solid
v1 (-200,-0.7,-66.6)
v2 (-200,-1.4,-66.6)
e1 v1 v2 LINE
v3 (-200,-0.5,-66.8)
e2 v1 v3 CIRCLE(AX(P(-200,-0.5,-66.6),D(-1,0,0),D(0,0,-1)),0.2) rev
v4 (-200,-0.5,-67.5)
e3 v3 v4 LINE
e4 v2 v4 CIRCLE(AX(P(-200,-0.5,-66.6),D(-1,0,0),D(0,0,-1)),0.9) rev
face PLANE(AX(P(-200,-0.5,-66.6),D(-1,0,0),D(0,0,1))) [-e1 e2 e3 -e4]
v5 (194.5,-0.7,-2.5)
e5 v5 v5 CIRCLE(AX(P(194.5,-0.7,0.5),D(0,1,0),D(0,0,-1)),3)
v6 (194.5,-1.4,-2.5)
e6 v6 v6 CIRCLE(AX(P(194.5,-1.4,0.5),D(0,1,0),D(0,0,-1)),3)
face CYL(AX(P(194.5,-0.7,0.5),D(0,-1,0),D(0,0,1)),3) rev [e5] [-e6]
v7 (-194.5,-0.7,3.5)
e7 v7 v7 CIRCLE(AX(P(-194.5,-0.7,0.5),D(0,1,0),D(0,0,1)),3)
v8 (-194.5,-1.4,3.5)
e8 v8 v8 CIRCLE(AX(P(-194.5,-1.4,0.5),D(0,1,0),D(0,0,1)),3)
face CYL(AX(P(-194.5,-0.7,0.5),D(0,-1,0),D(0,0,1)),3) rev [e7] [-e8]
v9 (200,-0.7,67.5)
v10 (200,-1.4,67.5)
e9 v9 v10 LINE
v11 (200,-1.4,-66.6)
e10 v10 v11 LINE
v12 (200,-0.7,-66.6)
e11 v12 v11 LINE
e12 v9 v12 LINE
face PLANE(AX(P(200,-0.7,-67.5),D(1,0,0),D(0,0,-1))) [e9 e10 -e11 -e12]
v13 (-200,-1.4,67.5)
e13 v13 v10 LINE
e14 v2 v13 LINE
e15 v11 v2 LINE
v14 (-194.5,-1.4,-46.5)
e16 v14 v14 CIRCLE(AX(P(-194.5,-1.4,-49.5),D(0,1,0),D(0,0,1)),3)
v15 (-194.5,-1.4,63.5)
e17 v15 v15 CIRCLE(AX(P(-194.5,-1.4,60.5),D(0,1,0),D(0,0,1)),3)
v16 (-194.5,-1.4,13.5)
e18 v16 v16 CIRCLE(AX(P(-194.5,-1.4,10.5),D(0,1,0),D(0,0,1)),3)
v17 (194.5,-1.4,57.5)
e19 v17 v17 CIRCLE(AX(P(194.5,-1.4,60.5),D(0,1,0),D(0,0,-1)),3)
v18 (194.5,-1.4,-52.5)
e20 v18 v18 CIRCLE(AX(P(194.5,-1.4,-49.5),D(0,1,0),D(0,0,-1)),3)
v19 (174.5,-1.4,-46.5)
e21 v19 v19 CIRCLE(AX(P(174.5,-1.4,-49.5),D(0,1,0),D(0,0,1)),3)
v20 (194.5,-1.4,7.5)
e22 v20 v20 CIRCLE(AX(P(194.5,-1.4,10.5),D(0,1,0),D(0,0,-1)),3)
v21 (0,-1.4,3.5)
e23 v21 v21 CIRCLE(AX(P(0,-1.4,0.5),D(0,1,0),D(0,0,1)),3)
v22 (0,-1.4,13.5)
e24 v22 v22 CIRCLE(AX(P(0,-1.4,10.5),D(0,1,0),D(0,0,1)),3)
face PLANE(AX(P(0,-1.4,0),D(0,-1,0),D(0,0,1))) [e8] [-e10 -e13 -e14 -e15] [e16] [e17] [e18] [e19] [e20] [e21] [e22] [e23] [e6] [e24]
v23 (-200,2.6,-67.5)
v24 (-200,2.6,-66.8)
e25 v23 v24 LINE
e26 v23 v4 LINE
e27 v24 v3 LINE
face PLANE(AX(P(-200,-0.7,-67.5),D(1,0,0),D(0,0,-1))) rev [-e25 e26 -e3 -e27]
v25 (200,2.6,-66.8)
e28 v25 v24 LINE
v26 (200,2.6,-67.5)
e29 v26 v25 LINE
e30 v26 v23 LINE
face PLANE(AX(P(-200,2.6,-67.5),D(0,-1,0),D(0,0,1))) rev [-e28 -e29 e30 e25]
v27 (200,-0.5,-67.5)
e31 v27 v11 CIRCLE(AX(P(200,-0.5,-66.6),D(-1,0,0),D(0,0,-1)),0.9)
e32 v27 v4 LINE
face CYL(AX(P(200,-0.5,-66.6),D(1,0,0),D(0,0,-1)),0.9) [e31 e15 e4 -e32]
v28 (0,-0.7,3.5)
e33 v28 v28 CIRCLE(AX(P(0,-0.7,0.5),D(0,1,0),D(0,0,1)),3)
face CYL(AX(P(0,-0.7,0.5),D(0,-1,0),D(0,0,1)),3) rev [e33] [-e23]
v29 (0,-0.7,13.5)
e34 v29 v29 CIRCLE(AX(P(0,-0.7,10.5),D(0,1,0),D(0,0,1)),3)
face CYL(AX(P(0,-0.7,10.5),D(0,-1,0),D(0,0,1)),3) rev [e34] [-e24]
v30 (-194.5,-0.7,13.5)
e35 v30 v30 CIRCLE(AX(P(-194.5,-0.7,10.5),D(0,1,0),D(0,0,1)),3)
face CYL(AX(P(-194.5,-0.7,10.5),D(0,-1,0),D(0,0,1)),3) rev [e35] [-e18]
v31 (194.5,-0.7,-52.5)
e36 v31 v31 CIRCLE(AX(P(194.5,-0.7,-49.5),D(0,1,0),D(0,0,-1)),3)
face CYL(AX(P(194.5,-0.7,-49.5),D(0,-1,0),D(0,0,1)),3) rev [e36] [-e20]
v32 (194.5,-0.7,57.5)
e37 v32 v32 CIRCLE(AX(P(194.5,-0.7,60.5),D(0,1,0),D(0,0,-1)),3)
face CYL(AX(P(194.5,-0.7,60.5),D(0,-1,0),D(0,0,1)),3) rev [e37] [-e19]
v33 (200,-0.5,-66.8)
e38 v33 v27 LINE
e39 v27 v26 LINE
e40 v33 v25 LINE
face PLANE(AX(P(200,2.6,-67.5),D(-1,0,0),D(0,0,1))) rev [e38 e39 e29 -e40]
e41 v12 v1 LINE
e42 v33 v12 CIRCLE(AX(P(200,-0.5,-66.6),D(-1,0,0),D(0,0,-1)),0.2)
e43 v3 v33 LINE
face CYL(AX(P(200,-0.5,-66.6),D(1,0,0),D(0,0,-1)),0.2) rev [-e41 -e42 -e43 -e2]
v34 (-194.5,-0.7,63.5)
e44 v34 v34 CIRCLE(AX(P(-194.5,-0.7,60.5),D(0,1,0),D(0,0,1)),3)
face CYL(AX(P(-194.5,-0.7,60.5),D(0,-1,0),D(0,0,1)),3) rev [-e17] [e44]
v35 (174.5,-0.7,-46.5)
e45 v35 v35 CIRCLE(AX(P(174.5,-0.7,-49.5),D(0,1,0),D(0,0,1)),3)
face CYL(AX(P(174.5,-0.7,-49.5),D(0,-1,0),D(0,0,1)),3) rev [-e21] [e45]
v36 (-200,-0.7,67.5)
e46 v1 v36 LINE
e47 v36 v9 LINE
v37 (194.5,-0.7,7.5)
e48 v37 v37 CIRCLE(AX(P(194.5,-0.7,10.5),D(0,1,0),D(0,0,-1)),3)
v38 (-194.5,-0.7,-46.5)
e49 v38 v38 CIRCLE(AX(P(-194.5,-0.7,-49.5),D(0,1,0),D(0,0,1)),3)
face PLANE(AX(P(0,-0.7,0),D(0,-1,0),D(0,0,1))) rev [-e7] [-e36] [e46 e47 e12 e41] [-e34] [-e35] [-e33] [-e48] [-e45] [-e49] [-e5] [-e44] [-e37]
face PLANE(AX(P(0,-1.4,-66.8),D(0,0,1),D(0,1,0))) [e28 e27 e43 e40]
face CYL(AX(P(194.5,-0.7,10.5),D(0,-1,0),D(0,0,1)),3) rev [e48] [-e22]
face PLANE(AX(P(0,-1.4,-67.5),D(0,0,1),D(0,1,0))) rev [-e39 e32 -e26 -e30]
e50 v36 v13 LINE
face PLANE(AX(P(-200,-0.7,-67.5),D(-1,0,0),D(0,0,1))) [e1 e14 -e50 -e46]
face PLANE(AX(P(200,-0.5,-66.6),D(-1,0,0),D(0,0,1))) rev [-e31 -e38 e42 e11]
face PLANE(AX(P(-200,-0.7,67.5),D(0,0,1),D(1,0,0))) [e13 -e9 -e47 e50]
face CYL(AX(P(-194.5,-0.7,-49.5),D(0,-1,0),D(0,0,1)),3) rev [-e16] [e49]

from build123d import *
from build123d.topology import SkipClean

# Parameters (mm, degrees)
SKETCH_1_W                       = 400
SKETCH_1_H                       = 135
SKETCH_1_R                       = 3
SM_BASE_FLANGE_1_DEPTH           = 0.7
SM_EDGE_FLANGE_1_STRIP_W         = 3.2
SM_EDGE_FLANGE_1_STRIP_H         = 0.7
SM_EDGE_FLANGE_1_STRIP_CUT_DEPTH = 400
SM_EDGE_FLANGE_1_DEPTH           = 400
MOVE_START                       = -0.5
MOVE_BODY_1_OUTLINE_W            = 400
MOVE_BODY_1_OUTLINE_H            = 134.3
MOVE_BODY_1_OUTLINE_R            = 3
MOVE_BODY_1_DEPTH                = 0.5
MOVE_START_2                     = -4
MOVE_BODY_1_2_OUTLINE_W          = 400
MOVE_BODY_1_2_OUTLINE_H          = 0.7
MOVE_BODY_1_2_DEPTH              = 2.6
MOVE_START_3                     = -1.315058
MOVE_BODY_1_3_OUTLINE_W          = 400
MOVE_BODY_1_3_OUTLINE_H          = 134.3
MOVE_BODY_1_3_OUTLINE_R          = 3
MOVE_BODY_1_3_DEPTH              = 0.615058
MOVE_BODY_1_4_OUTLINE_W          = 400
MOVE_BODY_1_4_OUTLINE_H          = 0.7
MOVE_BODY_1_4_DEPTH              = 3.1
MOVE_START_4                     = -1.4
MOVE_BODY_1_5_OUTLINE_W          = 400
MOVE_BODY_1_5_OUTLINE_H          = 134.3
MOVE_BODY_1_5_OUTLINE_R          = 3
MOVE_BODY_1_5_DEPTH              = 0.084942
MOVE_START_5                     = -0.639415385
MOVE_BODY_1_6_OUTLINE_W          = 400
MOVE_BODY_1_6_OUTLINE_H          = 0.7
MOVE_BODY_1_6_DEPTH              = 0.139415385
MOVE_START_6                     = -200
MOVE_BODY_1_7_DEPTH              = 400
MOVE_BODY_1_8_DEPTH              = 400


with BuildPart() as part:
    # 基体-法兰1: sheet metal written as solids
    # 草图1 → 基体-法兰1 (new body)
    with BuildSketch(Plane(origin=(0, 0, 0), x_dir=(1, 0, 0), z_dir=(0, 1, 0))):
        Rectangle(SKETCH_1_W, SKETCH_1_H)
        with Locations(Location((-194.5, -60.5, 0), (0, 0, 270))):
            Circle(SKETCH_1_R, mode=Mode.SUBTRACT)
        with Locations(Location((-194.5, -10.5, 0), (0, 0, 270))):
            Circle(SKETCH_1_R, mode=Mode.SUBTRACT)
        with Locations(Location((-194.5, -0.5, 0), (0, 0, 270))):
            Circle(SKETCH_1_R, mode=Mode.SUBTRACT)
        with Locations(Location((-194.5, 49.5, 0), (0, 0, 270))):
            Circle(SKETCH_1_R, mode=Mode.SUBTRACT)
        with Locations(Location((0, -10.5, 0), (0, 0, 270))):
            Circle(SKETCH_1_R, mode=Mode.SUBTRACT)
        with Locations(Location((0, -0.5, 0), (0, 0, 270))):
            Circle(SKETCH_1_R, mode=Mode.SUBTRACT)
        with Locations(Location((194.5, -60.5, 0), (0, 0, 90))):
            Circle(SKETCH_1_R, mode=Mode.SUBTRACT)
        with Locations(Location((194.5, -10.5, 0), (0, 0, 90))):
            Circle(SKETCH_1_R, mode=Mode.SUBTRACT)
        with Locations(Location((194.5, -0.5, 0), (0, 0, 90))):
            Circle(SKETCH_1_R, mode=Mode.SUBTRACT)
        with Locations(Location((194.5, 49.5, 0), (0, 0, 90))):
            Circle(SKETCH_1_R, mode=Mode.SUBTRACT)
        with Locations(Location((174.5, 49.5, 0), (0, 0, 270))):
            Circle(SKETCH_1_R, mode=Mode.SUBTRACT)
    extrude(amount=-SM_BASE_FLANGE_1_DEPTH)

    # 边线-法兰1: sheet metal written as solids
    # 边线-法兰1 strip (on a plane across the edge) → 边线-法兰1 strip cut (cut)
    with BuildSketch(Plane(origin=(-200, -0.7, -67.5), x_dir=(0, 0, 1), z_dir=(1, 0, 0))):
        with Locations((-0.7, -0.35)):
            Rectangle(SM_EDGE_FLANGE_1_STRIP_W, SM_EDGE_FLANGE_1_STRIP_H)
    extrude(amount=SM_EDGE_FLANGE_1_STRIP_CUT_DEPTH, mode=Mode.SUBTRACT)

    # 边线-法兰1 section (on a plane across the edge) → 边线-法兰1 (add)
    with BuildSketch(Plane(origin=(-200, -0.7, -67.5), x_dir=(0, 0, 1), z_dir=(1, 0, 0))):
        with BuildLine():
            Line((0, 0.2), (0, 3.3))
            Line((0, 3.3), (0.7, 3.3))
            Line((0.7, 3.3), (0.7, 0.2))
            ThreePointArc((0.7, 0.2), (0.758578644, 0.058578644), (0.9, 0))
            Line((0.9, 0), (0.9, -0.7))
            ThreePointArc((0.9, -0.7), (0.263603897, -0.436396103), (0, 0.2))
        make_face()
    extrude(amount=SM_EDGE_FLANGE_1_DEPTH)

    # Move Body 1: read off the stored shape, not the designer's step
    # Move Body 1 outline → Move Body 1 (cut)
    with BuildSketch(Plane(origin=(0, 0, 0), x_dir=(1, 0, 0), z_dir=(0, 1, 0)).offset(MOVE_START)):
        with Locations((0, -0.35)):
            Rectangle(MOVE_BODY_1_OUTLINE_W, MOVE_BODY_1_OUTLINE_H)
        with Locations((-194.5, -60.5)):
            Circle(MOVE_BODY_1_OUTLINE_R, mode=Mode.SUBTRACT)
        with Locations((-194.5, -10.5)):
            Circle(MOVE_BODY_1_OUTLINE_R, mode=Mode.SUBTRACT)
        with Locations((-194.5, -0.5)):
            Circle(MOVE_BODY_1_OUTLINE_R, mode=Mode.SUBTRACT)
        with Locations((194.5, -60.5)):
            Circle(MOVE_BODY_1_OUTLINE_R, mode=Mode.SUBTRACT)
        with Locations((0, -10.5)):
            Circle(MOVE_BODY_1_OUTLINE_R, mode=Mode.SUBTRACT)
        with Locations((0, -0.5)):
            Circle(MOVE_BODY_1_OUTLINE_R, mode=Mode.SUBTRACT)
        with Locations((194.5, -10.5)):
            Circle(MOVE_BODY_1_OUTLINE_R, mode=Mode.SUBTRACT)
        with Locations((194.5, -0.5)):
            Circle(MOVE_BODY_1_OUTLINE_R, mode=Mode.SUBTRACT)
        with Locations((-194.5, 49.5)):
            Circle(MOVE_BODY_1_OUTLINE_R, mode=Mode.SUBTRACT)
        with Locations((174.5, 49.5)):
            Circle(MOVE_BODY_1_OUTLINE_R, mode=Mode.SUBTRACT)
        with Locations((194.5, 49.5)):
            Circle(MOVE_BODY_1_OUTLINE_R, mode=Mode.SUBTRACT)
    extrude(amount=MOVE_BODY_1_DEPTH, mode=Mode.SUBTRACT)

    # Move Body 1 2 outline → Move Body 1 2 (cut)
    with BuildSketch(Plane(origin=(0, 0, 0), x_dir=(1, 0, 0), z_dir=(0, 1, 0)).offset(MOVE_START_2)):
        with Locations((0, 67.15)):
            Rectangle(MOVE_BODY_1_2_OUTLINE_W, MOVE_BODY_1_2_OUTLINE_H)
    extrude(amount=MOVE_BODY_1_2_DEPTH, mode=Mode.SUBTRACT)

    # Move Body 1 3 outline → Move Body 1 3 (add)
    with SkipClean():  # the faces are left unmerged after this step: merging them gives an invalid solid
        with BuildSketch(Plane(origin=(0, 0, 0), x_dir=(1, 0, 0), z_dir=(0, 1, 0)).offset(MOVE_START_3)):
            with Locations((0, -0.35)):
                Rectangle(MOVE_BODY_1_3_OUTLINE_W, MOVE_BODY_1_3_OUTLINE_H)
            with Locations((-194.5, -60.5)):
                Circle(MOVE_BODY_1_3_OUTLINE_R, mode=Mode.SUBTRACT)
            with Locations((-194.5, -10.5)):
                Circle(MOVE_BODY_1_3_OUTLINE_R, mode=Mode.SUBTRACT)
            with Locations((-194.5, -0.5)):
                Circle(MOVE_BODY_1_3_OUTLINE_R, mode=Mode.SUBTRACT)
            with Locations((194.5, -60.5)):
                Circle(MOVE_BODY_1_3_OUTLINE_R, mode=Mode.SUBTRACT)
            with Locations((0, -10.5)):
                Circle(MOVE_BODY_1_3_OUTLINE_R, mode=Mode.SUBTRACT)
            with Locations((0, -0.5)):
                Circle(MOVE_BODY_1_3_OUTLINE_R, mode=Mode.SUBTRACT)
            with Locations((194.5, -10.5)):
                Circle(MOVE_BODY_1_3_OUTLINE_R, mode=Mode.SUBTRACT)
            with Locations((194.5, -0.5)):
                Circle(MOVE_BODY_1_3_OUTLINE_R, mode=Mode.SUBTRACT)
            with Locations((-194.5, 49.5)):
                Circle(MOVE_BODY_1_3_OUTLINE_R, mode=Mode.SUBTRACT)
            with Locations((174.5, 49.5)):
                Circle(MOVE_BODY_1_3_OUTLINE_R, mode=Mode.SUBTRACT)
            with Locations((194.5, 49.5)):
                Circle(MOVE_BODY_1_3_OUTLINE_R, mode=Mode.SUBTRACT)
        extrude(amount=MOVE_BODY_1_3_DEPTH)

    # Move Body 1 4 outline → Move Body 1 4 (add)
    with SkipClean():  # the faces are left unmerged after this step: merging them gives an invalid solid
        with BuildSketch(Plane(origin=(0, 0, 0), x_dir=(1, 0, 0), z_dir=(0, 1, 0)).offset(MOVE_START)):
            with Locations((0, 67.15)):
                Rectangle(MOVE_BODY_1_4_OUTLINE_W, MOVE_BODY_1_4_OUTLINE_H)
        extrude(amount=MOVE_BODY_1_4_DEPTH)

    # Move Body 1 5 outline → Move Body 1 5 (add)
    with SkipClean():  # the faces are left unmerged after this step: merging them gives an invalid solid
        with BuildSketch(Plane(origin=(0, 0, 0), x_dir=(1, 0, 0), z_dir=(0, 1, 0)).offset(MOVE_START_4)):
            with Locations((0, -0.35)):
                Rectangle(MOVE_BODY_1_5_OUTLINE_W, MOVE_BODY_1_5_OUTLINE_H)
            with Locations((-194.5, -60.5)):
                Circle(MOVE_BODY_1_5_OUTLINE_R, mode=Mode.SUBTRACT)
            with Locations((-194.5, -10.5)):
                Circle(MOVE_BODY_1_5_OUTLINE_R, mode=Mode.SUBTRACT)
            with Locations((-194.5, -0.5)):
                Circle(MOVE_BODY_1_5_OUTLINE_R, mode=Mode.SUBTRACT)
            with Locations((194.5, -60.5)):
                Circle(MOVE_BODY_1_5_OUTLINE_R, mode=Mode.SUBTRACT)
            with Locations((0, -10.5)):
                Circle(MOVE_BODY_1_5_OUTLINE_R, mode=Mode.SUBTRACT)
            with Locations((0, -0.5)):
                Circle(MOVE_BODY_1_5_OUTLINE_R, mode=Mode.SUBTRACT)
            with Locations((194.5, -10.5)):
                Circle(MOVE_BODY_1_5_OUTLINE_R, mode=Mode.SUBTRACT)
            with Locations((194.5, -0.5)):
                Circle(MOVE_BODY_1_5_OUTLINE_R, mode=Mode.SUBTRACT)
            with Locations((-194.5, 49.5)):
                Circle(MOVE_BODY_1_5_OUTLINE_R, mode=Mode.SUBTRACT)
            with Locations((174.5, 49.5)):
                Circle(MOVE_BODY_1_5_OUTLINE_R, mode=Mode.SUBTRACT)
            with Locations((194.5, 49.5)):
                Circle(MOVE_BODY_1_5_OUTLINE_R, mode=Mode.SUBTRACT)
        extrude(amount=MOVE_BODY_1_5_DEPTH)

    # Move Body 1 6 outline → Move Body 1 6 (add)
    with SkipClean():  # the faces are left unmerged after this step: merging them gives an invalid solid
        with BuildSketch(Plane(origin=(0, 0, 0), x_dir=(1, 0, 0), z_dir=(0, 1, 0)).offset(MOVE_START_5)):
            with Locations((0, 67.15)):
                Rectangle(MOVE_BODY_1_6_OUTLINE_W, MOVE_BODY_1_6_OUTLINE_H)
        extrude(amount=MOVE_BODY_1_6_DEPTH)

    # Move Body 1 7 outline → Move Body 1 7 (cut)
    with BuildSketch(Plane.YZ.offset(MOVE_START_6)):
        with BuildLine():
            Line((-0.5, 67.5), (-0.7, 67.5))
            Line((-0.7, 67.5), (-0.7, -66.6))
            ThreePointArc((-0.7, -66.6), (-0.641421356, -66.741421356), (-0.5, -66.8))
            Line((-0.5, -66.8), (-0.5, 67.5))
        make_face()
        with BuildLine():
            ThreePointArc((-0.5, -67.5), (-0.569919006, -67.497279963), (-0.639415385, -67.489136295))
            Line((-0.639415385, -67.489136295), (-0.639415385, -67.5))
            Line((-0.639415385, -67.5), (-0.5, -67.5))
        make_face()
        with BuildLine():
            ThreePointArc((-0.7, -67.477496439), (-1.203562364, -67.161248608), (-1.4, -66.6))
            Line((-1.4, -66.6), (-1.4, -67.5))
            Line((-1.4, -67.5), (-0.9, -67.5))
            ThreePointArc((-0.9, -67.5), (-0.799368978, -67.494356415), (-0.7, -67.477496439))
        make_face()
    extrude(amount=MOVE_BODY_1_7_DEPTH, mode=Mode.SUBTRACT)

    # Move Body 1 8 outline → Move Body 1 8 (add)
    with BuildSketch(Plane.YZ.offset(MOVE_START_6)):
        with BuildLine():
            ThreePointArc((-0.639415385, -67.461449742), (-0.669567969, -67.47000062), (-0.7, -67.477496439))
            ThreePointArc((-0.7, -67.477496439), (-0.669807457, -67.483835634), (-0.639415385, -67.489136295))
            Line((-0.639415385, -67.489136295), (-0.639415385, -67.461449742))
        make_face()
    extrude(amount=MOVE_BODY_1_8_DEPTH)


solid = part.part
